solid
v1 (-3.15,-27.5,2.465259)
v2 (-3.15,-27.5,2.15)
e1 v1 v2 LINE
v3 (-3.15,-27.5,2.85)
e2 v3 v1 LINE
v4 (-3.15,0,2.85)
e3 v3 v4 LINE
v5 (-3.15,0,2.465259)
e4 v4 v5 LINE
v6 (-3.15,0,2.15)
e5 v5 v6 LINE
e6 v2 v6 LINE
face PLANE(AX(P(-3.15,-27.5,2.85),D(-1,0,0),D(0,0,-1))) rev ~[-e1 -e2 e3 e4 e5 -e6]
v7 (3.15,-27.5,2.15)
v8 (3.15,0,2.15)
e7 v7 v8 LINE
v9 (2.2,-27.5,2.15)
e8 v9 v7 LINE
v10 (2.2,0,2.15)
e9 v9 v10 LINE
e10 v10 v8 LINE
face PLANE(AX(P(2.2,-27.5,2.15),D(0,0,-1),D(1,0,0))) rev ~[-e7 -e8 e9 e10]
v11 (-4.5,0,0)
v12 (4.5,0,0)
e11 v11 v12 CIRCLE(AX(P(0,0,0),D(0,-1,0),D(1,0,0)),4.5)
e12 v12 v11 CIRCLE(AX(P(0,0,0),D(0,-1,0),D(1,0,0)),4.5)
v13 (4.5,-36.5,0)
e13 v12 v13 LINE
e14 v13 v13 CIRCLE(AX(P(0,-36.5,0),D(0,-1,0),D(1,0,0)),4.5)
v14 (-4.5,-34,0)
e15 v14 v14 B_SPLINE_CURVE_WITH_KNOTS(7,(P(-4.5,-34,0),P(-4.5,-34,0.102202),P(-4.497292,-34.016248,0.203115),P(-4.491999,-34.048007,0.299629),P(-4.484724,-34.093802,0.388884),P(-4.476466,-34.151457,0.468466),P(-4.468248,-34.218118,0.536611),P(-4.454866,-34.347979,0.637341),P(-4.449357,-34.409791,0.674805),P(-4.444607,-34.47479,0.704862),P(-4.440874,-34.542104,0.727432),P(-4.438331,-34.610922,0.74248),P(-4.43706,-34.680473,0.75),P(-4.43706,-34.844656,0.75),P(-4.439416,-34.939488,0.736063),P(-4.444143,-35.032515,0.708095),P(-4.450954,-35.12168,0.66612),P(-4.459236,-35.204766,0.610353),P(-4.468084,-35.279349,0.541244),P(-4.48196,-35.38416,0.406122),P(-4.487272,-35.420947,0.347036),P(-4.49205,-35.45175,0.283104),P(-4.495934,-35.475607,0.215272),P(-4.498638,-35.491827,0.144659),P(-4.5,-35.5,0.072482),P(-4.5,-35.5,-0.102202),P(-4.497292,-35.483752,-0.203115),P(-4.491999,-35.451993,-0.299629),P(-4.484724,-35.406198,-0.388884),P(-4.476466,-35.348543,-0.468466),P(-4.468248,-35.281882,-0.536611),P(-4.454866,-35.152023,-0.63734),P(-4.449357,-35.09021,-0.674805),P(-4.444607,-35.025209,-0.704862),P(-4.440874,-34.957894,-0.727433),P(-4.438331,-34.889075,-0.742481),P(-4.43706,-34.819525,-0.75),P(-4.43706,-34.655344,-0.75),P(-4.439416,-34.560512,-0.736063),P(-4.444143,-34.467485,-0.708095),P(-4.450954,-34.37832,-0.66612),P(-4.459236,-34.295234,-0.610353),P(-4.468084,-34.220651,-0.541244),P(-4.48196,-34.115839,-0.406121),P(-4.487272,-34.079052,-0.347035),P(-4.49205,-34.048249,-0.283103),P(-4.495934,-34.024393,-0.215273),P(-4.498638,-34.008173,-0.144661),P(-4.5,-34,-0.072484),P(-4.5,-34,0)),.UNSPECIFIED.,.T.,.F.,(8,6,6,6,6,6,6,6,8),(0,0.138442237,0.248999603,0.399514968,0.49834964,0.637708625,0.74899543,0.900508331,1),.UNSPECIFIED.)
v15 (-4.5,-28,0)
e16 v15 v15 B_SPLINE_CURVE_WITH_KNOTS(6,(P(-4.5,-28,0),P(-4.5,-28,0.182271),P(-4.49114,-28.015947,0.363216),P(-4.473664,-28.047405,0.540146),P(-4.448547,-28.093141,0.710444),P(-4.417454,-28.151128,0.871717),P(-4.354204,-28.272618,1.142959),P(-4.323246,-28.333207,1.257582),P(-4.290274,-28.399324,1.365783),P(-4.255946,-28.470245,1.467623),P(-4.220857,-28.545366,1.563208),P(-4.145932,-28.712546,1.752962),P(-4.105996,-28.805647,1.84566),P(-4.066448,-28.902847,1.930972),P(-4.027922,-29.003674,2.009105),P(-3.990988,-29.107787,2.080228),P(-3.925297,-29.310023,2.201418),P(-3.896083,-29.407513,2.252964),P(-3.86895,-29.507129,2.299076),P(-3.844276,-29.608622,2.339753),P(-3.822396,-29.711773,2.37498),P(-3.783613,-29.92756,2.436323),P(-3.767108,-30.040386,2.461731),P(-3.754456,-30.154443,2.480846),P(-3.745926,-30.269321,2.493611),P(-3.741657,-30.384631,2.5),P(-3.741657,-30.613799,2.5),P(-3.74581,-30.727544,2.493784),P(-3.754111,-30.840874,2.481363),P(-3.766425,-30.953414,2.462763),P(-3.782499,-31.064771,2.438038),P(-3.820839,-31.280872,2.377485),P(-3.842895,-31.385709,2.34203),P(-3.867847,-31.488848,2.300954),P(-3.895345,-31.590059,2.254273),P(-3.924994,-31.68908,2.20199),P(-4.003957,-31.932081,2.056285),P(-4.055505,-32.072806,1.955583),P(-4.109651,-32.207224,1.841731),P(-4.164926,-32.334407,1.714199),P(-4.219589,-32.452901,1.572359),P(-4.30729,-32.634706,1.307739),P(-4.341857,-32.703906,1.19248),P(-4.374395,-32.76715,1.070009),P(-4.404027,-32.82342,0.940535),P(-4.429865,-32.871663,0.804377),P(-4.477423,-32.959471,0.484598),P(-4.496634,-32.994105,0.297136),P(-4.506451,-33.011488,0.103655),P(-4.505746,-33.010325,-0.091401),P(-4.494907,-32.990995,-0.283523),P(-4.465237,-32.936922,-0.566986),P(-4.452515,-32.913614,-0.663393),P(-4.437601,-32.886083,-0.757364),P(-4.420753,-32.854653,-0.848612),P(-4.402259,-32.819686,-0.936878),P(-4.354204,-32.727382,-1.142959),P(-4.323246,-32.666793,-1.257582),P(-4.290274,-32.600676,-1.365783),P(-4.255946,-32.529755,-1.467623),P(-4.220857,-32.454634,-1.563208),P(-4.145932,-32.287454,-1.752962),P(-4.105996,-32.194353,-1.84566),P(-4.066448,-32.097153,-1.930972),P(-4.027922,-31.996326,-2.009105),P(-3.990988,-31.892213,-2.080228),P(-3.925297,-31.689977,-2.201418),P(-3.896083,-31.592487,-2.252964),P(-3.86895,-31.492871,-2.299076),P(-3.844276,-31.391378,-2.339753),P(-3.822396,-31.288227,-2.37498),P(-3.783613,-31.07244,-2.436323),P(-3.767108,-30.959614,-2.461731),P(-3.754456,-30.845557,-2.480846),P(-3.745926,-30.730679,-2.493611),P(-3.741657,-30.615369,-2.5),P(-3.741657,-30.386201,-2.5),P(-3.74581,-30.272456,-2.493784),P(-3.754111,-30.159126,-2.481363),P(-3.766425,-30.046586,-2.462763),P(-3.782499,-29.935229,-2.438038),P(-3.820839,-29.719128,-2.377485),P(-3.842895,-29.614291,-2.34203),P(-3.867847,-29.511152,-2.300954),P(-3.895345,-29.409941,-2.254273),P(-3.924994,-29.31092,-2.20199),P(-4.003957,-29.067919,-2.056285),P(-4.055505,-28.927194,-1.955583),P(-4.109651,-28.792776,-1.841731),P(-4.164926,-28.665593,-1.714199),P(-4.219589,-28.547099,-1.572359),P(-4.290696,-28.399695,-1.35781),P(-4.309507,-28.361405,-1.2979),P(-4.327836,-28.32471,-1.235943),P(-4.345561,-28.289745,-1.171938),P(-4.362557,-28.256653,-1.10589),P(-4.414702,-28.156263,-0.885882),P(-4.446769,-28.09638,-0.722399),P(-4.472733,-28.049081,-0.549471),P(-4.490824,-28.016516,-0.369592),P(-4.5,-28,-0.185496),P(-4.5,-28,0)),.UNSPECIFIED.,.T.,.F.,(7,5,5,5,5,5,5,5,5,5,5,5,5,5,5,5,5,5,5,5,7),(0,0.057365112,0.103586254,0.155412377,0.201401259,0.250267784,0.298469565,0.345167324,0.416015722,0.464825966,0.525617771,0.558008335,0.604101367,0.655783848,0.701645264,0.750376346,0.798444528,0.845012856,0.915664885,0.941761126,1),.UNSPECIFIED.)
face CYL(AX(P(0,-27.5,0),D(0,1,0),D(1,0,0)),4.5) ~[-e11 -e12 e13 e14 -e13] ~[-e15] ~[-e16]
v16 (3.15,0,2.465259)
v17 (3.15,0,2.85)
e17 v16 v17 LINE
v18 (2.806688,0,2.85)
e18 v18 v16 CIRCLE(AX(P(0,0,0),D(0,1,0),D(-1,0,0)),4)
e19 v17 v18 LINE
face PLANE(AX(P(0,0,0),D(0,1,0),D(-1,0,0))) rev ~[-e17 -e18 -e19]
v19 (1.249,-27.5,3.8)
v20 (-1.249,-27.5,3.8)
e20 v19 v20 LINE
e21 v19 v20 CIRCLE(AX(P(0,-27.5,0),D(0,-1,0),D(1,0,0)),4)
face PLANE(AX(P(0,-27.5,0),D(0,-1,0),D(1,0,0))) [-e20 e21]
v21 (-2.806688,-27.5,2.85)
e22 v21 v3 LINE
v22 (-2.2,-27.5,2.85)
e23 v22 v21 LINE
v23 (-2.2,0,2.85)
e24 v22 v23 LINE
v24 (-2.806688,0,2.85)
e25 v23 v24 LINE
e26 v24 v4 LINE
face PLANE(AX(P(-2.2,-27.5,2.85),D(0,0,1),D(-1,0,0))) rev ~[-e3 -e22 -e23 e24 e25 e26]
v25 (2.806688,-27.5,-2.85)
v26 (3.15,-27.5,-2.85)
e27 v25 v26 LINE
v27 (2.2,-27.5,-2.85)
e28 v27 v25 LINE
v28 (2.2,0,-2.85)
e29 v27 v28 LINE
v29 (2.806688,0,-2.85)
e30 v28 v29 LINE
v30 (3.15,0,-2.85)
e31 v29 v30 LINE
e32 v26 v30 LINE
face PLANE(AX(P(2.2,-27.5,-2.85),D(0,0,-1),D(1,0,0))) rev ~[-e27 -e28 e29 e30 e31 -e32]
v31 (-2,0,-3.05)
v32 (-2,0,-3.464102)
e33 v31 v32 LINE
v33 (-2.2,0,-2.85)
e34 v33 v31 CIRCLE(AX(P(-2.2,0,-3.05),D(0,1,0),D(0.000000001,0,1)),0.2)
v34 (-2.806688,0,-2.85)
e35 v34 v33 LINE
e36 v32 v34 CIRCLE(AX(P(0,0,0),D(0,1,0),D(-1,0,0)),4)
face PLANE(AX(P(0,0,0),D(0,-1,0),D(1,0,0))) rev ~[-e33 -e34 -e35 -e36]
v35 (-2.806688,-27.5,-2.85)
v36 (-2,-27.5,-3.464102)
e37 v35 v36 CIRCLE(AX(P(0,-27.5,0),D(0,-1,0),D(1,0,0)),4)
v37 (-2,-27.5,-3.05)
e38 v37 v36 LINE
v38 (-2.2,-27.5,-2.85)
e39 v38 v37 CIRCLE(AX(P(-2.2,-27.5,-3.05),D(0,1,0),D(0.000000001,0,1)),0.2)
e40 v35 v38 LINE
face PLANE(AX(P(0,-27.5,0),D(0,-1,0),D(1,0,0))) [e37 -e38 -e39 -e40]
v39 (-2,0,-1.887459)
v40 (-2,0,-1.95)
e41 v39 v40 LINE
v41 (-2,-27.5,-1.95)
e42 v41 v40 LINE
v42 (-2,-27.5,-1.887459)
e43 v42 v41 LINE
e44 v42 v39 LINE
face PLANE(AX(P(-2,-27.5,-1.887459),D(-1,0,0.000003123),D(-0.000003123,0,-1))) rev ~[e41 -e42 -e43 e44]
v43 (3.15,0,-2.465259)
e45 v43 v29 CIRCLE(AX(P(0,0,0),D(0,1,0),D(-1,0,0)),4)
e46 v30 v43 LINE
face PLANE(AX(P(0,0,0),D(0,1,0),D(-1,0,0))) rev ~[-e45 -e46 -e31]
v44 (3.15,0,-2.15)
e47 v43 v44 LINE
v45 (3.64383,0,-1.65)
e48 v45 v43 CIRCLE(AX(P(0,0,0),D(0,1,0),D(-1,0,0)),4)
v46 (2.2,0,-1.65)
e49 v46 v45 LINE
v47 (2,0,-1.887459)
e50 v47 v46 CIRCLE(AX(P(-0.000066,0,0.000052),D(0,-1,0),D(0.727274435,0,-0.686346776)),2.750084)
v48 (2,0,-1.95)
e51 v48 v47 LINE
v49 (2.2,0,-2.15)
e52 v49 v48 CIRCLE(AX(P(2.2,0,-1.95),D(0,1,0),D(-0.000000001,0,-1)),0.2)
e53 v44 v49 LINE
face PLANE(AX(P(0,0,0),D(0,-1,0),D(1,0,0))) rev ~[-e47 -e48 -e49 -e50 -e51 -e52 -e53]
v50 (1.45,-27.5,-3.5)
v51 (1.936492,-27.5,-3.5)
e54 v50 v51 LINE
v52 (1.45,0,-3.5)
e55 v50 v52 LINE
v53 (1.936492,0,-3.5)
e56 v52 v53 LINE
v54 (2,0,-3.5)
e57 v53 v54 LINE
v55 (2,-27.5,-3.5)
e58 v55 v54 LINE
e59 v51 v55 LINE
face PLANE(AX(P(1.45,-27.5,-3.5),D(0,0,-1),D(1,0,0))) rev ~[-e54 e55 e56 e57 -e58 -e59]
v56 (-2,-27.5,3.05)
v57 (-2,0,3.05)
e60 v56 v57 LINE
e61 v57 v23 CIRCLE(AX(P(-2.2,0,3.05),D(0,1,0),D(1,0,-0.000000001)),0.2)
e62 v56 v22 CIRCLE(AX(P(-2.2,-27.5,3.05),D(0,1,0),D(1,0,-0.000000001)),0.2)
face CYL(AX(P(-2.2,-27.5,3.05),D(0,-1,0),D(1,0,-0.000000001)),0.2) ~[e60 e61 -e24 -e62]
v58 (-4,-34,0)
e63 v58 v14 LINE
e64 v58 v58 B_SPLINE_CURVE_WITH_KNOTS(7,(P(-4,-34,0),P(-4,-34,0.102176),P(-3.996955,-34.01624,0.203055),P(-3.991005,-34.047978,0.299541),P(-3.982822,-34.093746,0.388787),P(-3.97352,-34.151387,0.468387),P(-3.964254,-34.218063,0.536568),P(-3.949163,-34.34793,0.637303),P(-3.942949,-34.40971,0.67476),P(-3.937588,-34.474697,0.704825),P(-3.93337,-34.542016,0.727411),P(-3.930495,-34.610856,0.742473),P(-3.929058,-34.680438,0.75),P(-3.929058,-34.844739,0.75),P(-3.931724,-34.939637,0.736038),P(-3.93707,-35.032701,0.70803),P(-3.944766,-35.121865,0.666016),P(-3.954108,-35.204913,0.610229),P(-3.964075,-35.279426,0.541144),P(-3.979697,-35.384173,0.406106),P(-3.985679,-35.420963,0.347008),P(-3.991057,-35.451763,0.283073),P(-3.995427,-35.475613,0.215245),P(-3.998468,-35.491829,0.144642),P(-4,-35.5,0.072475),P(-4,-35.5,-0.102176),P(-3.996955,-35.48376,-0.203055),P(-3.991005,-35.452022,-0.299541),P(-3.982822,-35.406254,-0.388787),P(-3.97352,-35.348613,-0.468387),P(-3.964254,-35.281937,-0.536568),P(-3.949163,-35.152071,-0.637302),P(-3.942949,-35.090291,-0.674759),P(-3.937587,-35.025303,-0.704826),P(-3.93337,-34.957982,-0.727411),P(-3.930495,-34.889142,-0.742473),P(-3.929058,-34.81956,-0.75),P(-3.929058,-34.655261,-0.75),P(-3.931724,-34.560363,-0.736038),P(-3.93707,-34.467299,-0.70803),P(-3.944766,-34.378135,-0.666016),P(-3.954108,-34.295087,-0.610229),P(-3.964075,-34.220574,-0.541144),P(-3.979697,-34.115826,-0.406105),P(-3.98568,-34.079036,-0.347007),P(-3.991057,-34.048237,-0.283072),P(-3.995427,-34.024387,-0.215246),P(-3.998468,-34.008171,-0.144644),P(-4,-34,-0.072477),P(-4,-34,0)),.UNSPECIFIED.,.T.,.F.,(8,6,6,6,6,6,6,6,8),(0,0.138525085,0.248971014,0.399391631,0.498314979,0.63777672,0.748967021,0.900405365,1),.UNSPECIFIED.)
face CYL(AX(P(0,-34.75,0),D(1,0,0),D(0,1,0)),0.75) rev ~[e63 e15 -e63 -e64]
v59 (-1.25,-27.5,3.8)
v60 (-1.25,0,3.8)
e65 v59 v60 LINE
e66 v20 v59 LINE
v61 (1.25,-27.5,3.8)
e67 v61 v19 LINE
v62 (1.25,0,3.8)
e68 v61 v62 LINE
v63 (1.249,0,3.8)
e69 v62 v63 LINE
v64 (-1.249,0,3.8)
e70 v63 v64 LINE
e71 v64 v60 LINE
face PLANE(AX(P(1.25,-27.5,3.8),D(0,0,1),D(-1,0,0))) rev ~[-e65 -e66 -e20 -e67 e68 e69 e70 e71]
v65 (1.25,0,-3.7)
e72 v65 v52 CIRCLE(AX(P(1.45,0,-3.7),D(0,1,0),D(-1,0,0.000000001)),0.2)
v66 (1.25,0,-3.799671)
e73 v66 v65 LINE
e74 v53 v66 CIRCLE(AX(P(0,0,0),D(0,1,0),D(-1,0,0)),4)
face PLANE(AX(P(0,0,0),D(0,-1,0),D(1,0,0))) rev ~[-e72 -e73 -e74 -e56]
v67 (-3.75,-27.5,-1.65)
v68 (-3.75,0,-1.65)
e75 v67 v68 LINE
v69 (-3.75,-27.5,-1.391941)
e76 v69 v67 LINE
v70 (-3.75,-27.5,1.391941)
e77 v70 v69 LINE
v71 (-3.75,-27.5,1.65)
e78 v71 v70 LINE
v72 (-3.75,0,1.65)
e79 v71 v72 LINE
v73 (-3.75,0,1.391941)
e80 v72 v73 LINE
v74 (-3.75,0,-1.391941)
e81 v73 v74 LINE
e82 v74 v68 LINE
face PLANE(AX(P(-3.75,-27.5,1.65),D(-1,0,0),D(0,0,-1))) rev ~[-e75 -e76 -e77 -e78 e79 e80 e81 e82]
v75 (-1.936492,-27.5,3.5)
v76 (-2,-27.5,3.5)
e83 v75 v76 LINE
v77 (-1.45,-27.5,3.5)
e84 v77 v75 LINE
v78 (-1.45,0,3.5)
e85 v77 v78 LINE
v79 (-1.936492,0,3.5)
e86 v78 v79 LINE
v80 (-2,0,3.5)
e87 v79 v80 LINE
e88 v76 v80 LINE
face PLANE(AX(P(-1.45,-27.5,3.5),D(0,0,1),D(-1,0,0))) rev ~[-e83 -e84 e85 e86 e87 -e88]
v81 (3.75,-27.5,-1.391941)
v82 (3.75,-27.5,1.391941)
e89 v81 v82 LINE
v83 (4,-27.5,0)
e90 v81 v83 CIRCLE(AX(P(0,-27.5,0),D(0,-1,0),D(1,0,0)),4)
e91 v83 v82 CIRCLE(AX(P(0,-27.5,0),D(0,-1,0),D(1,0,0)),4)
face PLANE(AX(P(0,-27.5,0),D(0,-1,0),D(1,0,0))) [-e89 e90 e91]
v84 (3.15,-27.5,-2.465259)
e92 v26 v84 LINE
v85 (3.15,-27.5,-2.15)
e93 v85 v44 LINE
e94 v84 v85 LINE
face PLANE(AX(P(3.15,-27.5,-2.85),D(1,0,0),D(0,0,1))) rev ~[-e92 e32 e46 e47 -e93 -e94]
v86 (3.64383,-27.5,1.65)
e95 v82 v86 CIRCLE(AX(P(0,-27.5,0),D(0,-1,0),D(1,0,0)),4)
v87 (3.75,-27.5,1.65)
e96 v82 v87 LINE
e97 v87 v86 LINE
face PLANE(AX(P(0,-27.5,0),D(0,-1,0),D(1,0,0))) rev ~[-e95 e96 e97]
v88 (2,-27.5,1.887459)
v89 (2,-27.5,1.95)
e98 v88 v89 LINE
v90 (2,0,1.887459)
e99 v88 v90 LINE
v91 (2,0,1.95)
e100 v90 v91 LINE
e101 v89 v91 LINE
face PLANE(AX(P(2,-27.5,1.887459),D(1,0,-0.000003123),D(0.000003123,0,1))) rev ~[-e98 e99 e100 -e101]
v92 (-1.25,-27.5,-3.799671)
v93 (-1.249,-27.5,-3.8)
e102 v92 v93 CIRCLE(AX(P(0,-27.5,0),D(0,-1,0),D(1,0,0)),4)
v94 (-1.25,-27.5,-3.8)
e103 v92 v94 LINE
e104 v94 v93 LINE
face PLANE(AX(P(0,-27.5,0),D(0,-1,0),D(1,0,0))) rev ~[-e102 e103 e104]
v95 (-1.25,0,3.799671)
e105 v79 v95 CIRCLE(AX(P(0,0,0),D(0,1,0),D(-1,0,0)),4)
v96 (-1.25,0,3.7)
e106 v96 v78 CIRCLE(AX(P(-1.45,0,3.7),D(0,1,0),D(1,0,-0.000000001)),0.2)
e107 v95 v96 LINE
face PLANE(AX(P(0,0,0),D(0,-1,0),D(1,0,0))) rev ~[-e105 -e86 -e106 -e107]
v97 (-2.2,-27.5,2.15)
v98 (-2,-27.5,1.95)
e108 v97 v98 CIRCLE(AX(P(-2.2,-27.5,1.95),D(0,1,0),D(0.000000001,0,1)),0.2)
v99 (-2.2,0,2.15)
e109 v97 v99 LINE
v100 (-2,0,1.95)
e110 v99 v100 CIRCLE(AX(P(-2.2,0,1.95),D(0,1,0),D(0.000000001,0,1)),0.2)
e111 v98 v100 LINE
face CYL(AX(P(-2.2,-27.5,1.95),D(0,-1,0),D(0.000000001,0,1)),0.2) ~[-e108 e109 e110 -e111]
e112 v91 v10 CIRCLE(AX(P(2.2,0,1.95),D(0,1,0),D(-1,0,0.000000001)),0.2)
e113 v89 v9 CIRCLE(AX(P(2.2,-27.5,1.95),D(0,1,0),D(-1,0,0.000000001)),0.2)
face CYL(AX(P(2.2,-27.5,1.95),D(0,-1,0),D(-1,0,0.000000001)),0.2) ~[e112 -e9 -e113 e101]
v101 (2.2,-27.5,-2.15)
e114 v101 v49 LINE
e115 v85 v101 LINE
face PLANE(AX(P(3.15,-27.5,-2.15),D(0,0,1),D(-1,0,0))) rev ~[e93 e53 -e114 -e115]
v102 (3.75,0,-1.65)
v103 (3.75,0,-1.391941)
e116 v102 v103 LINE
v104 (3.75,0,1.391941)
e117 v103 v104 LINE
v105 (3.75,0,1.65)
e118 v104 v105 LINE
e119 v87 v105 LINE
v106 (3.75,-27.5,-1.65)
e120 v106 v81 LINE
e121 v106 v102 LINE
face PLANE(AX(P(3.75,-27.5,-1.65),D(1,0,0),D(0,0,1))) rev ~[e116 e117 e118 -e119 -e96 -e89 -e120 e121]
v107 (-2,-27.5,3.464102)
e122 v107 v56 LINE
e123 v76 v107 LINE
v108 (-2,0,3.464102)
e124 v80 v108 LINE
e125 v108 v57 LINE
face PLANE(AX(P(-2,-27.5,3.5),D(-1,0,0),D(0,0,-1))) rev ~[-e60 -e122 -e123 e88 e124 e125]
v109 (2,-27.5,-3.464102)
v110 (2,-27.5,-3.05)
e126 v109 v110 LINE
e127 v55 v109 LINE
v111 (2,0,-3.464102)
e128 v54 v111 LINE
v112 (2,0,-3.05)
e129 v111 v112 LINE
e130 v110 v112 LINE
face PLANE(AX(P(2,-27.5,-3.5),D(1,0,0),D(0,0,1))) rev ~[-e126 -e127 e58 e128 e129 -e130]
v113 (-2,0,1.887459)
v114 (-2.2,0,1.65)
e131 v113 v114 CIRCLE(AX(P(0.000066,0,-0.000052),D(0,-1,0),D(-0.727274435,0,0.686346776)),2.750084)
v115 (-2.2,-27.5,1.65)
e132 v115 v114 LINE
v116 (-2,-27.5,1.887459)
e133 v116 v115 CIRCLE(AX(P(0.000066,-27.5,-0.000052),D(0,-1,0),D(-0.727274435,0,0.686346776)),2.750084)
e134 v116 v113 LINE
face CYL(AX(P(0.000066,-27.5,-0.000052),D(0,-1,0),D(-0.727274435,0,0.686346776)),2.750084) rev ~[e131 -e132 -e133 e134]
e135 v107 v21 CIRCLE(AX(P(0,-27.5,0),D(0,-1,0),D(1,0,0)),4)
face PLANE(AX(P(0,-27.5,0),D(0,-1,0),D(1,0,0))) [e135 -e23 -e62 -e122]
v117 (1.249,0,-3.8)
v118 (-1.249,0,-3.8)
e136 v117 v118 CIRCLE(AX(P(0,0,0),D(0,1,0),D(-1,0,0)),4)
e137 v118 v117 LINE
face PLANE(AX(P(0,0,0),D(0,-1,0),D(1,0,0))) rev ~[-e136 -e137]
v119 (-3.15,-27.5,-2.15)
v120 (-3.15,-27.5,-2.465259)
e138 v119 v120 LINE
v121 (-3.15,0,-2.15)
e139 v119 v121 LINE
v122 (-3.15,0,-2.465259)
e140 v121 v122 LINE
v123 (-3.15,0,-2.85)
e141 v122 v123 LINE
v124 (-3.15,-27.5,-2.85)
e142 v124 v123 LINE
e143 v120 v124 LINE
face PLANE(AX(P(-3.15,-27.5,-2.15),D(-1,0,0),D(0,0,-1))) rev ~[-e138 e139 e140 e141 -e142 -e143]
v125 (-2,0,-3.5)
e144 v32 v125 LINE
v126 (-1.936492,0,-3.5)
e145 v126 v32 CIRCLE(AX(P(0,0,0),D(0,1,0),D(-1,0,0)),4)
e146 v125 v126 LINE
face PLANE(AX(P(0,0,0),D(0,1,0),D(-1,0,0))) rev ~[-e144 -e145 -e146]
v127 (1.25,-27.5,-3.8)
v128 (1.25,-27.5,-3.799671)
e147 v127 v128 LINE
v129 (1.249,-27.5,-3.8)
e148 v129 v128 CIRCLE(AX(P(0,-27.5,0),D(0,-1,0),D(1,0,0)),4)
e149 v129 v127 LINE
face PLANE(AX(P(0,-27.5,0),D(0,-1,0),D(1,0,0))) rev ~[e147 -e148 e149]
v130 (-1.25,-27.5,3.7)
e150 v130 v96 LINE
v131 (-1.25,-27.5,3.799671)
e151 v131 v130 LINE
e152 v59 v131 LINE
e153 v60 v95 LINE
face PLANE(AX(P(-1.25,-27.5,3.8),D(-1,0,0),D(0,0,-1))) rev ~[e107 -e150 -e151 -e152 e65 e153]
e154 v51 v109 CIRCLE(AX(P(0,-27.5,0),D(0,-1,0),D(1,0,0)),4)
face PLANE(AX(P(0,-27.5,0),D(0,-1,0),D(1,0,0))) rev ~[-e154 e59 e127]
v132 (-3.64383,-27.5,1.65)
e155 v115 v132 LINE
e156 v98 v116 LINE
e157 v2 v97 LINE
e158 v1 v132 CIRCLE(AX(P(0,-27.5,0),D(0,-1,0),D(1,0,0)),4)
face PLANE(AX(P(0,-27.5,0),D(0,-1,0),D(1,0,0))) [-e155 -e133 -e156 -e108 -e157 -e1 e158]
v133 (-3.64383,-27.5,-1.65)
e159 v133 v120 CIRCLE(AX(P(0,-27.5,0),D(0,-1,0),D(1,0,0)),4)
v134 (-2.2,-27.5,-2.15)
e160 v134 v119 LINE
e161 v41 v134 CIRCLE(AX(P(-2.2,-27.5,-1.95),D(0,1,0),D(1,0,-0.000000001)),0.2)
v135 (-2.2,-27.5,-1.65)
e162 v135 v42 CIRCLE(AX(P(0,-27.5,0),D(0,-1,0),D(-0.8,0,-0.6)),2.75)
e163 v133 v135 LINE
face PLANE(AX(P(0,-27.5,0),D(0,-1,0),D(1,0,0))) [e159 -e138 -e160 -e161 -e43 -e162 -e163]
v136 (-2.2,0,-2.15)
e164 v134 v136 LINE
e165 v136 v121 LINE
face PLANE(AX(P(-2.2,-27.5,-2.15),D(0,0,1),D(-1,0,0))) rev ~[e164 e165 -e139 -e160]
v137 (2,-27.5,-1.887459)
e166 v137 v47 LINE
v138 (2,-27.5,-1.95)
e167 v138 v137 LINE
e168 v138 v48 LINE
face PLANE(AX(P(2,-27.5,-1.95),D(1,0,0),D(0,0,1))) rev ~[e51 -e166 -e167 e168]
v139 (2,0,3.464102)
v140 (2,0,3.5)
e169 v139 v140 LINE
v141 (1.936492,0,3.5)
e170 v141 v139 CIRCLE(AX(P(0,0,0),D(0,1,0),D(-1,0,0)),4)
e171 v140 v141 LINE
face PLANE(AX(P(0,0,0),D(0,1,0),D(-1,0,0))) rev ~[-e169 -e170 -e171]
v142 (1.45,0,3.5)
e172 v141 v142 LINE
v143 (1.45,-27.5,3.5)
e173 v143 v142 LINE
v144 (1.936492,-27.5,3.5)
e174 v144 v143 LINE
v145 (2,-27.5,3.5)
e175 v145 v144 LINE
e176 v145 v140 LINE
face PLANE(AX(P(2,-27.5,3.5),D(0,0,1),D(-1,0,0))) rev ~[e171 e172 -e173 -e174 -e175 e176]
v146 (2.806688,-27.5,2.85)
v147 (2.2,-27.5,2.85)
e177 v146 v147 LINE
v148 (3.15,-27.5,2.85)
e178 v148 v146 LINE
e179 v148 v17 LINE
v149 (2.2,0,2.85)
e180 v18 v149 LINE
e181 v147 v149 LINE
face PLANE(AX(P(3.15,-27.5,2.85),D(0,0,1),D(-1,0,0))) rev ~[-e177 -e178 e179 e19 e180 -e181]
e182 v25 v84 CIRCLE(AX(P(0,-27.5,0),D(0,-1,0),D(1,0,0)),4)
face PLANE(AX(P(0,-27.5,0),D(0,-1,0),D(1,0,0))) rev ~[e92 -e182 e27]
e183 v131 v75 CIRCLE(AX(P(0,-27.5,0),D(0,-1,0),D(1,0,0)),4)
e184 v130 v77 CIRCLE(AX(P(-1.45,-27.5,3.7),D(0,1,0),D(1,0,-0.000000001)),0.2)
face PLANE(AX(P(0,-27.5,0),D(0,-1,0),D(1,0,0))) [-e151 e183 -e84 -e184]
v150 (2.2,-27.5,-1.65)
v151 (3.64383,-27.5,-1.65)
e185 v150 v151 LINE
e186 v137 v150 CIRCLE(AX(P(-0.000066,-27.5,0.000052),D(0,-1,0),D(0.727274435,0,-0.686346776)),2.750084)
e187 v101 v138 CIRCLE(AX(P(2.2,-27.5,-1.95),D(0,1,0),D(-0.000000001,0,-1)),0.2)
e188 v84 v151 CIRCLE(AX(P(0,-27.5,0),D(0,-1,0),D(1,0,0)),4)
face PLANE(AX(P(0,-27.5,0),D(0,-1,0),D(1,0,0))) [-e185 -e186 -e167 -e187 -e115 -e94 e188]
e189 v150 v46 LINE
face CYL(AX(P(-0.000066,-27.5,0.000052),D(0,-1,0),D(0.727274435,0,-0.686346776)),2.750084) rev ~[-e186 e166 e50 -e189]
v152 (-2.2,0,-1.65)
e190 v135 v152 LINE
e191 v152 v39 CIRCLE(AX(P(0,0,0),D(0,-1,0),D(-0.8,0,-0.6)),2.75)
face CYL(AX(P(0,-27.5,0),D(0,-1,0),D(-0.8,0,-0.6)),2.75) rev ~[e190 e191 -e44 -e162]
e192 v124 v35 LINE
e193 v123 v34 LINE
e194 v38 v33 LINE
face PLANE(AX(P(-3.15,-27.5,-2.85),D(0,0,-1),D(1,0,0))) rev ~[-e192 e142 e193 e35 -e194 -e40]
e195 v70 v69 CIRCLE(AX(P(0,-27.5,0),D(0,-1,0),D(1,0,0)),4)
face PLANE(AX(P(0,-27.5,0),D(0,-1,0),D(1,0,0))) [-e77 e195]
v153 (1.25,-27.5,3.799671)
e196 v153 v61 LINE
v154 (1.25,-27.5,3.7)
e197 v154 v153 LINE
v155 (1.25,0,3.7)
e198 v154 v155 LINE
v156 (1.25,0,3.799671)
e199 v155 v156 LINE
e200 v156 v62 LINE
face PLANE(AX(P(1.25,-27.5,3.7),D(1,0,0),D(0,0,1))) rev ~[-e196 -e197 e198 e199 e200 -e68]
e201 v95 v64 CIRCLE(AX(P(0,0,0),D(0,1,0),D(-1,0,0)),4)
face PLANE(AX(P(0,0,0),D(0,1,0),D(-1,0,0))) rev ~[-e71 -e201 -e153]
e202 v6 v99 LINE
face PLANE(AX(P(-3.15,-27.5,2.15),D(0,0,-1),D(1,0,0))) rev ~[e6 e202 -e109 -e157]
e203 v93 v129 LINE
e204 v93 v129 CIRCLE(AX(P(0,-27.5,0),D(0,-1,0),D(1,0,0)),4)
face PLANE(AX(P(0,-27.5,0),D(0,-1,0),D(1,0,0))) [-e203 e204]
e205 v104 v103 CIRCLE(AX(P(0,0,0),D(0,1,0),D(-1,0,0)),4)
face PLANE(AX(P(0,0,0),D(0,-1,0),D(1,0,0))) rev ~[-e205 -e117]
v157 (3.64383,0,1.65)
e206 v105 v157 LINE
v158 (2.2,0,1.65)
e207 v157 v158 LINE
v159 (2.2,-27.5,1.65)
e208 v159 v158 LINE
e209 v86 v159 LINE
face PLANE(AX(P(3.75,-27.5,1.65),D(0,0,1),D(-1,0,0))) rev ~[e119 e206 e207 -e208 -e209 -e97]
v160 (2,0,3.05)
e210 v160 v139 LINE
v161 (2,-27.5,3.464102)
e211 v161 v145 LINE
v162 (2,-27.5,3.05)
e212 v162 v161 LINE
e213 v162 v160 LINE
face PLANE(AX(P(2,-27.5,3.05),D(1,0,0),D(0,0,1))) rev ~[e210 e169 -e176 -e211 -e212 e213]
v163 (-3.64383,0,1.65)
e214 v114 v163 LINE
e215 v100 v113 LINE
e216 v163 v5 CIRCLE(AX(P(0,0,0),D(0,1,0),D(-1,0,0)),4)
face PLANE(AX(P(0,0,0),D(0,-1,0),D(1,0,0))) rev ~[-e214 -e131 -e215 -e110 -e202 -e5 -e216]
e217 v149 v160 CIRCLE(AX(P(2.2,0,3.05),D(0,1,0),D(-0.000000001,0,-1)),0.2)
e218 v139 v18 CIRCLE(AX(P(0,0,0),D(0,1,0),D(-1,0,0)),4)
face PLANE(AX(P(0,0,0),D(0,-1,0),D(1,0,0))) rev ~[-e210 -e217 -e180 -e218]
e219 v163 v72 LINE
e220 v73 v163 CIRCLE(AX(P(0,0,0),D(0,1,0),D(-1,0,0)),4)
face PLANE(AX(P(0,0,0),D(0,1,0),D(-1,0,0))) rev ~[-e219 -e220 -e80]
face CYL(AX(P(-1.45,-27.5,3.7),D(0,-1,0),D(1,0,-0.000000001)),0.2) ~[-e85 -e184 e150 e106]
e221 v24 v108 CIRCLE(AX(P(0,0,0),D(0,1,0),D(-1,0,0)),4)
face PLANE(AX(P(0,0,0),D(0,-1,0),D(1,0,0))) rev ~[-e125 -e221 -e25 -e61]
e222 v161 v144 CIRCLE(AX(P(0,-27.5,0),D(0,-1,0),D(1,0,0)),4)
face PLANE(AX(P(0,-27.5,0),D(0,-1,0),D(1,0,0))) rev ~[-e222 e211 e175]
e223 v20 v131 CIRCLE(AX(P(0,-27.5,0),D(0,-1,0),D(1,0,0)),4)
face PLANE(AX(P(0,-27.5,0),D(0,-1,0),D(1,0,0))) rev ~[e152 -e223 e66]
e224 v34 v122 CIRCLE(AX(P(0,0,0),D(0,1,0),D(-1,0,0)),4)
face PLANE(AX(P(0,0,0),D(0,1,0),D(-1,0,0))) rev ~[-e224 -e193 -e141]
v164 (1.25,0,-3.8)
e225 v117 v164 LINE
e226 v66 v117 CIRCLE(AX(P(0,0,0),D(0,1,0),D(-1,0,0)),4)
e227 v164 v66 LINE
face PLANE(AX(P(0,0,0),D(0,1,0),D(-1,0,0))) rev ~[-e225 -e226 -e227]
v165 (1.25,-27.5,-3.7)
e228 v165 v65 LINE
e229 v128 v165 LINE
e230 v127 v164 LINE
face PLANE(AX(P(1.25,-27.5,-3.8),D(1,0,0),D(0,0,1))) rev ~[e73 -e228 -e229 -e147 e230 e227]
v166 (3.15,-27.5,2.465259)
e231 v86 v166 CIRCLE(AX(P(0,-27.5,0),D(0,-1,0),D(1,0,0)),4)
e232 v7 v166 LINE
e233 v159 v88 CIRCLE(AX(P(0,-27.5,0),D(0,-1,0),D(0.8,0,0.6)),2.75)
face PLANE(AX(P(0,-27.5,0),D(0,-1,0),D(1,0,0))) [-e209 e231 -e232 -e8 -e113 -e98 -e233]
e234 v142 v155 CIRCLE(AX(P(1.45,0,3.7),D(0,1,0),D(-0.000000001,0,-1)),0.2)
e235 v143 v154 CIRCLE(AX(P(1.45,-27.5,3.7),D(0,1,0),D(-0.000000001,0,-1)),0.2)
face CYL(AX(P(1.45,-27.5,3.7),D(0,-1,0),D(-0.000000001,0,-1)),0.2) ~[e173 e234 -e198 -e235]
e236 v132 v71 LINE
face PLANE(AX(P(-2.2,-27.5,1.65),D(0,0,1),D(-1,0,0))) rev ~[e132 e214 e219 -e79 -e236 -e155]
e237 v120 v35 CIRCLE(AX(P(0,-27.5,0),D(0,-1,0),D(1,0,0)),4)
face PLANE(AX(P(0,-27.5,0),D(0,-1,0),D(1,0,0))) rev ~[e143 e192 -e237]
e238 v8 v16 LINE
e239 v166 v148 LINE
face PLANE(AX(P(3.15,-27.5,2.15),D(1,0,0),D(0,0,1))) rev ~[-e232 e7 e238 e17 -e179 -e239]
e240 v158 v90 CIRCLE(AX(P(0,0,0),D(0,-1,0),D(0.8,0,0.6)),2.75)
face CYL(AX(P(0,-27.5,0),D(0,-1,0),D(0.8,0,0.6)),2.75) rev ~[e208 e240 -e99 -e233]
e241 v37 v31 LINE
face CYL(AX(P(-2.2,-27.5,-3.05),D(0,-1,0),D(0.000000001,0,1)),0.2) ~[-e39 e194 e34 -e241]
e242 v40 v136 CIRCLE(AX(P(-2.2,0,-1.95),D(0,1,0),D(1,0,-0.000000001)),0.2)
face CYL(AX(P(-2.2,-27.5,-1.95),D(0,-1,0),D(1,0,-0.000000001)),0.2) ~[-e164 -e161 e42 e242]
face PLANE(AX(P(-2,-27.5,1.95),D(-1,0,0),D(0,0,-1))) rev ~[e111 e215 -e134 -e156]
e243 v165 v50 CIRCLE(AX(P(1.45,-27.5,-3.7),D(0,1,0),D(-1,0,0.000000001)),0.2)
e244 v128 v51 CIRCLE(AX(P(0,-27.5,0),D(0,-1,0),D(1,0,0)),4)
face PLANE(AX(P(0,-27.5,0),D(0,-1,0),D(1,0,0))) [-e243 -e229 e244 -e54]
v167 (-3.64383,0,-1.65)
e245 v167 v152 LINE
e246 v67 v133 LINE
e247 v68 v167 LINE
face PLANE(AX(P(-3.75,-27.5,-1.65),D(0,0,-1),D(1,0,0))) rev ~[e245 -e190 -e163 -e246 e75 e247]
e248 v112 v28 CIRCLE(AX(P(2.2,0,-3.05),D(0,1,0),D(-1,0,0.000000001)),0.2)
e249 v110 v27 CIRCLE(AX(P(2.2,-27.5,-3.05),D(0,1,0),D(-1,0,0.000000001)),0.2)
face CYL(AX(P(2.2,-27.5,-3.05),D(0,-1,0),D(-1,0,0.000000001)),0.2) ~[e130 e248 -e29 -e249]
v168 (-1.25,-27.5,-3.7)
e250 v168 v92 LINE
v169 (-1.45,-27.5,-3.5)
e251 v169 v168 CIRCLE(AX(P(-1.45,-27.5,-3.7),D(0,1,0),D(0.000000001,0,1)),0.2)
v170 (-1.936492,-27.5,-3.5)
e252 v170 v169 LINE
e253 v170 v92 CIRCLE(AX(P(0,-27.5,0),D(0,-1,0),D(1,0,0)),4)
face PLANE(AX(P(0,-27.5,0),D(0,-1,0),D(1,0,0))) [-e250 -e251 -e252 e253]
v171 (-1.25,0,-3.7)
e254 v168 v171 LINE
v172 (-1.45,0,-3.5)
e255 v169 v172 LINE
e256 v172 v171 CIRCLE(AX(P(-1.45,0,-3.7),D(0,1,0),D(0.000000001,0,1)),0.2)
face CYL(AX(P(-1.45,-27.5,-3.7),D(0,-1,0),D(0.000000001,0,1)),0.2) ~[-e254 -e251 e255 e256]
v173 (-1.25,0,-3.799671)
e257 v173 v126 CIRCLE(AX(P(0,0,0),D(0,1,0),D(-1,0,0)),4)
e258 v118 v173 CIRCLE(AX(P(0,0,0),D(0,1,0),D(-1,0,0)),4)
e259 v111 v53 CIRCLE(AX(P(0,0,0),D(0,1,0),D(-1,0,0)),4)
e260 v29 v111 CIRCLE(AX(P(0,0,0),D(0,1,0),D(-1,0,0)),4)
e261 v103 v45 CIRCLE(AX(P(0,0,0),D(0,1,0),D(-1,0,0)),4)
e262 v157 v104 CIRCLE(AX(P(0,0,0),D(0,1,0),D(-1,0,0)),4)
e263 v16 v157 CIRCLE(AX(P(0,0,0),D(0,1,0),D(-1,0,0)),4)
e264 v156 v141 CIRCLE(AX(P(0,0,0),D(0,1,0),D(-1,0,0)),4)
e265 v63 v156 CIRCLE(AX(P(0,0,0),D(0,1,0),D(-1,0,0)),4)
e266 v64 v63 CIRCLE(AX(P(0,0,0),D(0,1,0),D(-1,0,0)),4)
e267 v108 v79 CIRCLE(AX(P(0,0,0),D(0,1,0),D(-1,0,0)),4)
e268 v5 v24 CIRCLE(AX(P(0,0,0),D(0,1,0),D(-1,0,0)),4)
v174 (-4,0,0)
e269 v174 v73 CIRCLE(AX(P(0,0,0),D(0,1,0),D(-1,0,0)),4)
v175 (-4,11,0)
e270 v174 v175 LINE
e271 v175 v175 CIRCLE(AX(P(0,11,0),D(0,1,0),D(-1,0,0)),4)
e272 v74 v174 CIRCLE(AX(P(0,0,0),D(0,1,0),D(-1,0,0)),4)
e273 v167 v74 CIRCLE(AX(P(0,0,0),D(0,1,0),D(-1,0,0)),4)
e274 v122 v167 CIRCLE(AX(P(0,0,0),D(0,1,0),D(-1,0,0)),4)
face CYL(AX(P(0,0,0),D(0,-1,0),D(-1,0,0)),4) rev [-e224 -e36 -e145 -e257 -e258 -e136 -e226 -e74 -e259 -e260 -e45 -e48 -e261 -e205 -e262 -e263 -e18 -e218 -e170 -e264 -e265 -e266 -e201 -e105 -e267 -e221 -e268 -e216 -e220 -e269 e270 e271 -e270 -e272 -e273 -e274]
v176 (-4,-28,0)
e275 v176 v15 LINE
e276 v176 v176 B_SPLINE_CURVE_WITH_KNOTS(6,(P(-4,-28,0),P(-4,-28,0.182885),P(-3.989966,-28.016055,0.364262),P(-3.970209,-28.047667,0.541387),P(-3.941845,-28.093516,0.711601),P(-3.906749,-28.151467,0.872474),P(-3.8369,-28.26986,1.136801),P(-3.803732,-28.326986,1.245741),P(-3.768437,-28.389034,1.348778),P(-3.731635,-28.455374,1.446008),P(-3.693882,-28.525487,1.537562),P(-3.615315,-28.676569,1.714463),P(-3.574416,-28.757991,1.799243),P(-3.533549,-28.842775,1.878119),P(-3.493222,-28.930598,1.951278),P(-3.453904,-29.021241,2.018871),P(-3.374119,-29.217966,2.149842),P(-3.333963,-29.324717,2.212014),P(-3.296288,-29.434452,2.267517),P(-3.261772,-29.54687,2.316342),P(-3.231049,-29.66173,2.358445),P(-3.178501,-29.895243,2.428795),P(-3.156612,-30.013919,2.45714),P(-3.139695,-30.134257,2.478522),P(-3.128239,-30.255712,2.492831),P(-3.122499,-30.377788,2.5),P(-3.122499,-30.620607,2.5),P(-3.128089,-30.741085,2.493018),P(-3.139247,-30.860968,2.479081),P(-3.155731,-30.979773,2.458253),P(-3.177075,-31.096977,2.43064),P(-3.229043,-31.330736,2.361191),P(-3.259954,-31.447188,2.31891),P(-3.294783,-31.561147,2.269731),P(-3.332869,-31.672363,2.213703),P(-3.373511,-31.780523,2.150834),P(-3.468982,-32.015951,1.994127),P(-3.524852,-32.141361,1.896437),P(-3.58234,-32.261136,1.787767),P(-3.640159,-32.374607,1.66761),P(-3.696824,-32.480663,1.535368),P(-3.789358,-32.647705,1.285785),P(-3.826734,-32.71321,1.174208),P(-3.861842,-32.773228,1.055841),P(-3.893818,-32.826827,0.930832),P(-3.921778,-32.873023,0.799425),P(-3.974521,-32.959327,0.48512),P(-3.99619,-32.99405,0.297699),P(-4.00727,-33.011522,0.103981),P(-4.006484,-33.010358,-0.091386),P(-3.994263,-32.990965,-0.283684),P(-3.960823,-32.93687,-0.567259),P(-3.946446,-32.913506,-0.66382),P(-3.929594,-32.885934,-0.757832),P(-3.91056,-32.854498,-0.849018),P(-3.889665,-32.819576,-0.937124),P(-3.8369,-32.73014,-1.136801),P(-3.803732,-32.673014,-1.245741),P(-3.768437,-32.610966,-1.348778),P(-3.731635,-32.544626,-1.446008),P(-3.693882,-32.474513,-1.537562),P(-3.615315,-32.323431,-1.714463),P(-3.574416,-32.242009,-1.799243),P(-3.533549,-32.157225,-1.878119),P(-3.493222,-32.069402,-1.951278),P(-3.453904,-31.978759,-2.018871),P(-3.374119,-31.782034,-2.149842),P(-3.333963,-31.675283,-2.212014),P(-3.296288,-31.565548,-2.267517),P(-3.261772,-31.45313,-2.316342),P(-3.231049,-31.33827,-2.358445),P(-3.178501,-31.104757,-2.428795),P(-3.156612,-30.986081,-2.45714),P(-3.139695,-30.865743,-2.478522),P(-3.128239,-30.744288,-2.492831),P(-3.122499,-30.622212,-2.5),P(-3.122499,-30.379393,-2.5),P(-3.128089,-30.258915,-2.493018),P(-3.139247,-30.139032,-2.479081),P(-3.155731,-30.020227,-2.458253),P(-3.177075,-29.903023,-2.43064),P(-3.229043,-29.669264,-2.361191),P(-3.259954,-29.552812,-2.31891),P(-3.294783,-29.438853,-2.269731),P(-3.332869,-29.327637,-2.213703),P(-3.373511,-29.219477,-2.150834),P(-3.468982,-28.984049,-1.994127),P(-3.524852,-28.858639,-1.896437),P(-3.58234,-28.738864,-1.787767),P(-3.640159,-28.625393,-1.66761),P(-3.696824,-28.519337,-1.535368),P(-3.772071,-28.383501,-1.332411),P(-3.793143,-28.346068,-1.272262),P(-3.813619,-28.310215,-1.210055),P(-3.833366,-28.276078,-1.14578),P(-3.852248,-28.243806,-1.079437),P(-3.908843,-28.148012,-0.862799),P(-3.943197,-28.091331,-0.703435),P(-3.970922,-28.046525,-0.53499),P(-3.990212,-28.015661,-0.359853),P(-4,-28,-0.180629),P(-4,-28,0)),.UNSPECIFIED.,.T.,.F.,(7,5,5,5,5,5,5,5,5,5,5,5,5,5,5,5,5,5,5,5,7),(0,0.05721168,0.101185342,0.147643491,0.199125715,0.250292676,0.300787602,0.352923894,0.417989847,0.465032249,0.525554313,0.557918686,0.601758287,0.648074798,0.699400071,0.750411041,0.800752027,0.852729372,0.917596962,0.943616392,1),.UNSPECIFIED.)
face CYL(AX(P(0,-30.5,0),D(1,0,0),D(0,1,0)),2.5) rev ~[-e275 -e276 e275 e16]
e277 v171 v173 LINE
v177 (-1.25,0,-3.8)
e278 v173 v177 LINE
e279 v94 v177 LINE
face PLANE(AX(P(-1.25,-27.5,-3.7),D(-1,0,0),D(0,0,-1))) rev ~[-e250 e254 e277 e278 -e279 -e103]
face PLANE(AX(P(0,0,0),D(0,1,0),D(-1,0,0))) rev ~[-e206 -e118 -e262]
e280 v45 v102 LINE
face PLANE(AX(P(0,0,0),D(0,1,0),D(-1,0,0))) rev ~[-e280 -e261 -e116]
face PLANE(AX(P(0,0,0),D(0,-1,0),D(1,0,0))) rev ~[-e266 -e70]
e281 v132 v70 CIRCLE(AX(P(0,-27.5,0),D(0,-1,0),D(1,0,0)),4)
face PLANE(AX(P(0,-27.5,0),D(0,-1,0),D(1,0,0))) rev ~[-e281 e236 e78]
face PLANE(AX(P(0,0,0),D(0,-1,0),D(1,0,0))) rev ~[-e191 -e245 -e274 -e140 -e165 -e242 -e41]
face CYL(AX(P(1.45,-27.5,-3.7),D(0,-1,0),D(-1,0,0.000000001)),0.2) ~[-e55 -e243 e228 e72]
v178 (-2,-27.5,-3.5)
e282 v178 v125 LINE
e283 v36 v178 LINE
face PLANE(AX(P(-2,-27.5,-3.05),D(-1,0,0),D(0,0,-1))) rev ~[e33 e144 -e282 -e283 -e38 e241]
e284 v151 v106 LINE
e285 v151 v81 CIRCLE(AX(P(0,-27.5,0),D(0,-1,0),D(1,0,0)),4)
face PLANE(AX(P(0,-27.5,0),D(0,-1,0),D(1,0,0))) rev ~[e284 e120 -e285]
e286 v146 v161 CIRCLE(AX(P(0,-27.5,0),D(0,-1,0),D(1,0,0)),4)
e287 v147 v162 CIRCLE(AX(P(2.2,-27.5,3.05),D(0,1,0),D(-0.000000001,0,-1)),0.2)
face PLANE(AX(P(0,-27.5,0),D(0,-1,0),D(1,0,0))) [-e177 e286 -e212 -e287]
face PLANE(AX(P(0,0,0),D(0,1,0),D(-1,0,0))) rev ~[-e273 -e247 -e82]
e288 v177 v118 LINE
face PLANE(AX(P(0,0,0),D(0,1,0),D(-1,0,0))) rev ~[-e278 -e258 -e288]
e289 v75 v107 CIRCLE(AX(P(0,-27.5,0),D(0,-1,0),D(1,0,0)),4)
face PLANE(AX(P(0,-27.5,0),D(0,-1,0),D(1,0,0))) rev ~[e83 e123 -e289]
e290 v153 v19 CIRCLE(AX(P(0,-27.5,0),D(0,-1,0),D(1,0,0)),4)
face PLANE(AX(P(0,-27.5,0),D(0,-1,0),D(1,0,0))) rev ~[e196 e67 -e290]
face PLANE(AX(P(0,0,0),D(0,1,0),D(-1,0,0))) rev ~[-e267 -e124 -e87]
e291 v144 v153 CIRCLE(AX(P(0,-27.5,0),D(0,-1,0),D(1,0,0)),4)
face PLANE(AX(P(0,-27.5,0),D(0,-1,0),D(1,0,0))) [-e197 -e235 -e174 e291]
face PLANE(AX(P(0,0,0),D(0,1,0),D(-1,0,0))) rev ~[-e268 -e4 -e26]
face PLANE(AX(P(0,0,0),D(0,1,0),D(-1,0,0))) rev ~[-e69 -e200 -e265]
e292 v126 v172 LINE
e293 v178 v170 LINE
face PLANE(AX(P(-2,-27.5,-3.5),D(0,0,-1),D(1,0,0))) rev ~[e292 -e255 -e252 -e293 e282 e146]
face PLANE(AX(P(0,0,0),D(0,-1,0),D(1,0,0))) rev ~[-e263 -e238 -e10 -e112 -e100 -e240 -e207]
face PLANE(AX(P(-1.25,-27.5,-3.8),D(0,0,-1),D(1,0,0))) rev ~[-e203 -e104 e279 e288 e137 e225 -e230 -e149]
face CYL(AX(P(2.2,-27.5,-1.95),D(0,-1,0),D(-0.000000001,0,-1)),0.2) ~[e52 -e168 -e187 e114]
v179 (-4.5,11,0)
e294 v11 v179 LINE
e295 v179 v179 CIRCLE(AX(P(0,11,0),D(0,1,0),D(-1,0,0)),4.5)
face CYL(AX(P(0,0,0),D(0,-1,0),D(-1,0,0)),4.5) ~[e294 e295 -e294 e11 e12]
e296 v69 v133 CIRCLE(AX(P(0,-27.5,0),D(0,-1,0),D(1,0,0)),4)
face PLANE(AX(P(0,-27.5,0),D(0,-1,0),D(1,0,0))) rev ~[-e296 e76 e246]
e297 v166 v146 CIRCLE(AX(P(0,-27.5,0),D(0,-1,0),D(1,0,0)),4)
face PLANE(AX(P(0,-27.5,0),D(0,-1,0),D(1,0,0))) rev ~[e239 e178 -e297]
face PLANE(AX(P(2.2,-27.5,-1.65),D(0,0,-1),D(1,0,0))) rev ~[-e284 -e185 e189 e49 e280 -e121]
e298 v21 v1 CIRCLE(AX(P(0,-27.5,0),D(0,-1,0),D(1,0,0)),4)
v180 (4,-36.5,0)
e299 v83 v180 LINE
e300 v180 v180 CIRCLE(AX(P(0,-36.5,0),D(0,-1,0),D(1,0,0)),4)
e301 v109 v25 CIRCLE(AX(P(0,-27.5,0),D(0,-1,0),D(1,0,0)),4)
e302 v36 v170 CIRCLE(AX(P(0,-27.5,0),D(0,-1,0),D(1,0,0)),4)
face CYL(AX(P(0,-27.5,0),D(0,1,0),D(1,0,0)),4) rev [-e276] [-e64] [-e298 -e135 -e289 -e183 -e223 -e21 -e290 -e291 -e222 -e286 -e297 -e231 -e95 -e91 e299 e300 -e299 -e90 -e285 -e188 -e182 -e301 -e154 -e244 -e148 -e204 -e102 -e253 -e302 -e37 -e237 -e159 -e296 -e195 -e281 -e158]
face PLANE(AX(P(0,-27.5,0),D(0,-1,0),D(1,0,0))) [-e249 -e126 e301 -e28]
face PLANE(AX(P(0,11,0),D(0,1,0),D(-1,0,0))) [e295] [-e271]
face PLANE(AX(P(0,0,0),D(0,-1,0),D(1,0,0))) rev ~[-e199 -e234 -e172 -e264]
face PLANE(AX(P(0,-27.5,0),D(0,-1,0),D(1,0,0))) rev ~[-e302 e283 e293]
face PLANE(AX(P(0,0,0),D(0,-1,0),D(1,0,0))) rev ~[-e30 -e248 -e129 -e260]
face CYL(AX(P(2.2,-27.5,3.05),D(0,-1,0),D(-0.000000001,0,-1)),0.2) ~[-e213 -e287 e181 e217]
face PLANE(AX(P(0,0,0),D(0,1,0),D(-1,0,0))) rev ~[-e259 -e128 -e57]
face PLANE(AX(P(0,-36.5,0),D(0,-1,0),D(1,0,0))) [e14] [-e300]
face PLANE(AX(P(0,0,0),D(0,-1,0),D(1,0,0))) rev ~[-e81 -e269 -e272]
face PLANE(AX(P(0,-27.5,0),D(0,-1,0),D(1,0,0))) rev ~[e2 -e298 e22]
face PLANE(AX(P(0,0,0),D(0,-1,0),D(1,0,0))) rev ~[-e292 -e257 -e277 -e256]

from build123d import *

# Parameters (mm, degrees)
F3_R      = 4.5
F4_DEPTH  = 27.5
F8_DEPTH  = 27.5
F6_R      = 4.5
F6_R_2    = 4
F9_DEPTH  = 9
F7_R      = 4.5
F7_R_2    = 4
F10_DEPTH = 11
F11_R     = 2.5
F11_R_2   = 0.75
F12_DEPTH = 4.501


# Not quite as in the source:
# - ends of sketch curves that miss each other by under 0.0002 mm in the source are joined


with BuildPart() as f4:
    # F3 (on Front) → F4 (new body)
    with BuildSketch(Plane.XZ):
        Circle(F3_R)
    extrude(amount=F4_DEPTH)

    # F5 (on face) → F8 (cut, through all)
    with BuildSketch(Plane.XZ.offset(27.5)):
        with BuildLine():
            Line((-1.25, -3.8), (0, -3.8))
            Line((0, -3.8), (1.25, -3.8))
            Line((1.25, -3.8), (1.25, -3.7))
            ThreePointArc((1.25, -3.7), (1.3085786438, -3.5585786438), (1.45, -3.5))
            Line((1.45, -3.5), (2, -3.5))
            Line((2, -3.5), (2, -3.05))
            ThreePointArc((2, -3.05), (2.0585786438, -2.9085786438), (2.2, -2.85))
            Line((2.2, -2.85), (3.15, -2.85))
            Line((3.15, -2.85), (3.15, -2.15))
            Line((3.15, -2.15), (2.2, -2.15))
            ThreePointArc((2.2, -2.15), (2.0585786438, -2.0914213562), (2, -1.95))
            Line((2, -1.95), (2, -1.887459))
            ThreePointArc((2, -1.887459), (2.1033535752, -1.771554046), (2.2, -1.65))
            Line((2.2, -1.65), (3.75, -1.65))
            Line((3.75, -1.65), (3.75, 0))
            Line((3.75, 0), (3.75, 1.65))
            Line((3.75, 1.65), (2.2, 1.65))
            ThreePointArc((2.2, 1.65), (2.1033535752, 1.771554046), (1.9999998047, 1.8874588157))
            Line((1.9999998047, 1.8874588157), (2, 1.95))
            ThreePointArc((2, 1.95), (2.0585786438, 2.0914213562), (2.2, 2.15))
            Line((2.2, 2.15), (3.15, 2.15))
            Line((3.15, 2.15), (3.15, 2.85))
            Line((3.15, 2.85), (2.2, 2.85))
            ThreePointArc((2.2, 2.85), (2.0585786438, 2.9085786438), (2, 3.05))
            Line((2, 3.05), (2, 3.5))
            Line((2, 3.5), (1.45, 3.5))
            ThreePointArc((1.45, 3.5), (1.3085786438, 3.5585786438), (1.25, 3.7))
            Line((1.25, 3.7), (1.25, 3.8))
            Line((1.25, 3.8), (0, 3.8))
            Line((0, 3.8), (-1.25, 3.8))
            Line((-1.25, 3.8), (-1.25, 3.7))
            ThreePointArc((-1.25, 3.7), (-1.3085786438, 3.5585786438), (-1.45, 3.5))
            Line((-1.45, 3.5), (-2, 3.5))
            Line((-2, 3.5), (-2, 3.05))
            ThreePointArc((-2, 3.05), (-2.0585786438, 2.9085786438), (-2.2, 2.85))
            Line((-2.2, 2.85), (-3.15, 2.85))
            Line((-3.15, 2.85), (-3.15, 2.15))
            Line((-3.15, 2.15), (-2.2, 2.15))
            ThreePointArc((-2.2, 2.15), (-2.0585786438, 2.0914213562), (-2, 1.95))
            Line((-2, 1.95), (-2, 1.887459))
            ThreePointArc((-2, 1.887459), (-2.1033535752, 1.771554046), (-2.2, 1.65))
            Line((-2.2, 1.65), (-3.75, 1.65))
            Line((-3.75, 1.65), (-3.75, 0))
            Line((-3.75, 0), (-3.75, -1.65))
            Line((-3.75, -1.65), (-2.2, -1.65))
            ThreePointArc((-2.2, -1.65), (-2.1033535752, -1.771554046), (-1.9999998047, -1.8874588157))
            Line((-1.9999998047, -1.8874588157), (-2, -1.95))
            ThreePointArc((-2, -1.95), (-2.0585786438, -2.0914213562), (-2.2, -2.15))
            Line((-2.2, -2.15), (-3.15, -2.15))
            Line((-3.15, -2.15), (-3.15, -2.85))
            Line((-3.15, -2.85), (-2.2, -2.85))
            ThreePointArc((-2.2, -2.85), (-2.0585786438, -2.9085786438), (-2, -3.05))
            Line((-2, -3.05), (-2, -3.5))
            Line((-2, -3.5), (-1.45, -3.5))
            ThreePointArc((-1.45, -3.5), (-1.3085786438, -3.5585786438), (-1.25, -3.7))
            Line((-1.25, -3.7), (-1.25, -3.8))
        make_face()
    extrude(amount=-F8_DEPTH, mode=Mode.SUBTRACT)

    # F6 (on face) → F9 (join)
    with BuildSketch(Plane.XZ.offset(27.5)):
        Circle(F6_R)
        Circle(F6_R_2, mode=Mode.SUBTRACT)
    extrude(amount=F9_DEPTH)

    # F7 (on face) → F10 (join)
    with BuildSketch(Plane(origin=(0, 0, 0), x_dir=(-1, 0, 0), z_dir=(0, 1, 0))):
        Circle(F7_R)
        Circle(F7_R_2, mode=Mode.SUBTRACT)
    extrude(amount=F10_DEPTH)

    # F11 (on Right) → F12 (cut, through all)
    with BuildSketch(Plane.YZ):
        with Locations((-30.5, 0)):
            Circle(F11_R)
        with Locations((-34.75, 0)):
            Circle(F11_R_2)
    extrude(amount=-F12_DEPTH, mode=Mode.SUBTRACT)


solid = f4.part
